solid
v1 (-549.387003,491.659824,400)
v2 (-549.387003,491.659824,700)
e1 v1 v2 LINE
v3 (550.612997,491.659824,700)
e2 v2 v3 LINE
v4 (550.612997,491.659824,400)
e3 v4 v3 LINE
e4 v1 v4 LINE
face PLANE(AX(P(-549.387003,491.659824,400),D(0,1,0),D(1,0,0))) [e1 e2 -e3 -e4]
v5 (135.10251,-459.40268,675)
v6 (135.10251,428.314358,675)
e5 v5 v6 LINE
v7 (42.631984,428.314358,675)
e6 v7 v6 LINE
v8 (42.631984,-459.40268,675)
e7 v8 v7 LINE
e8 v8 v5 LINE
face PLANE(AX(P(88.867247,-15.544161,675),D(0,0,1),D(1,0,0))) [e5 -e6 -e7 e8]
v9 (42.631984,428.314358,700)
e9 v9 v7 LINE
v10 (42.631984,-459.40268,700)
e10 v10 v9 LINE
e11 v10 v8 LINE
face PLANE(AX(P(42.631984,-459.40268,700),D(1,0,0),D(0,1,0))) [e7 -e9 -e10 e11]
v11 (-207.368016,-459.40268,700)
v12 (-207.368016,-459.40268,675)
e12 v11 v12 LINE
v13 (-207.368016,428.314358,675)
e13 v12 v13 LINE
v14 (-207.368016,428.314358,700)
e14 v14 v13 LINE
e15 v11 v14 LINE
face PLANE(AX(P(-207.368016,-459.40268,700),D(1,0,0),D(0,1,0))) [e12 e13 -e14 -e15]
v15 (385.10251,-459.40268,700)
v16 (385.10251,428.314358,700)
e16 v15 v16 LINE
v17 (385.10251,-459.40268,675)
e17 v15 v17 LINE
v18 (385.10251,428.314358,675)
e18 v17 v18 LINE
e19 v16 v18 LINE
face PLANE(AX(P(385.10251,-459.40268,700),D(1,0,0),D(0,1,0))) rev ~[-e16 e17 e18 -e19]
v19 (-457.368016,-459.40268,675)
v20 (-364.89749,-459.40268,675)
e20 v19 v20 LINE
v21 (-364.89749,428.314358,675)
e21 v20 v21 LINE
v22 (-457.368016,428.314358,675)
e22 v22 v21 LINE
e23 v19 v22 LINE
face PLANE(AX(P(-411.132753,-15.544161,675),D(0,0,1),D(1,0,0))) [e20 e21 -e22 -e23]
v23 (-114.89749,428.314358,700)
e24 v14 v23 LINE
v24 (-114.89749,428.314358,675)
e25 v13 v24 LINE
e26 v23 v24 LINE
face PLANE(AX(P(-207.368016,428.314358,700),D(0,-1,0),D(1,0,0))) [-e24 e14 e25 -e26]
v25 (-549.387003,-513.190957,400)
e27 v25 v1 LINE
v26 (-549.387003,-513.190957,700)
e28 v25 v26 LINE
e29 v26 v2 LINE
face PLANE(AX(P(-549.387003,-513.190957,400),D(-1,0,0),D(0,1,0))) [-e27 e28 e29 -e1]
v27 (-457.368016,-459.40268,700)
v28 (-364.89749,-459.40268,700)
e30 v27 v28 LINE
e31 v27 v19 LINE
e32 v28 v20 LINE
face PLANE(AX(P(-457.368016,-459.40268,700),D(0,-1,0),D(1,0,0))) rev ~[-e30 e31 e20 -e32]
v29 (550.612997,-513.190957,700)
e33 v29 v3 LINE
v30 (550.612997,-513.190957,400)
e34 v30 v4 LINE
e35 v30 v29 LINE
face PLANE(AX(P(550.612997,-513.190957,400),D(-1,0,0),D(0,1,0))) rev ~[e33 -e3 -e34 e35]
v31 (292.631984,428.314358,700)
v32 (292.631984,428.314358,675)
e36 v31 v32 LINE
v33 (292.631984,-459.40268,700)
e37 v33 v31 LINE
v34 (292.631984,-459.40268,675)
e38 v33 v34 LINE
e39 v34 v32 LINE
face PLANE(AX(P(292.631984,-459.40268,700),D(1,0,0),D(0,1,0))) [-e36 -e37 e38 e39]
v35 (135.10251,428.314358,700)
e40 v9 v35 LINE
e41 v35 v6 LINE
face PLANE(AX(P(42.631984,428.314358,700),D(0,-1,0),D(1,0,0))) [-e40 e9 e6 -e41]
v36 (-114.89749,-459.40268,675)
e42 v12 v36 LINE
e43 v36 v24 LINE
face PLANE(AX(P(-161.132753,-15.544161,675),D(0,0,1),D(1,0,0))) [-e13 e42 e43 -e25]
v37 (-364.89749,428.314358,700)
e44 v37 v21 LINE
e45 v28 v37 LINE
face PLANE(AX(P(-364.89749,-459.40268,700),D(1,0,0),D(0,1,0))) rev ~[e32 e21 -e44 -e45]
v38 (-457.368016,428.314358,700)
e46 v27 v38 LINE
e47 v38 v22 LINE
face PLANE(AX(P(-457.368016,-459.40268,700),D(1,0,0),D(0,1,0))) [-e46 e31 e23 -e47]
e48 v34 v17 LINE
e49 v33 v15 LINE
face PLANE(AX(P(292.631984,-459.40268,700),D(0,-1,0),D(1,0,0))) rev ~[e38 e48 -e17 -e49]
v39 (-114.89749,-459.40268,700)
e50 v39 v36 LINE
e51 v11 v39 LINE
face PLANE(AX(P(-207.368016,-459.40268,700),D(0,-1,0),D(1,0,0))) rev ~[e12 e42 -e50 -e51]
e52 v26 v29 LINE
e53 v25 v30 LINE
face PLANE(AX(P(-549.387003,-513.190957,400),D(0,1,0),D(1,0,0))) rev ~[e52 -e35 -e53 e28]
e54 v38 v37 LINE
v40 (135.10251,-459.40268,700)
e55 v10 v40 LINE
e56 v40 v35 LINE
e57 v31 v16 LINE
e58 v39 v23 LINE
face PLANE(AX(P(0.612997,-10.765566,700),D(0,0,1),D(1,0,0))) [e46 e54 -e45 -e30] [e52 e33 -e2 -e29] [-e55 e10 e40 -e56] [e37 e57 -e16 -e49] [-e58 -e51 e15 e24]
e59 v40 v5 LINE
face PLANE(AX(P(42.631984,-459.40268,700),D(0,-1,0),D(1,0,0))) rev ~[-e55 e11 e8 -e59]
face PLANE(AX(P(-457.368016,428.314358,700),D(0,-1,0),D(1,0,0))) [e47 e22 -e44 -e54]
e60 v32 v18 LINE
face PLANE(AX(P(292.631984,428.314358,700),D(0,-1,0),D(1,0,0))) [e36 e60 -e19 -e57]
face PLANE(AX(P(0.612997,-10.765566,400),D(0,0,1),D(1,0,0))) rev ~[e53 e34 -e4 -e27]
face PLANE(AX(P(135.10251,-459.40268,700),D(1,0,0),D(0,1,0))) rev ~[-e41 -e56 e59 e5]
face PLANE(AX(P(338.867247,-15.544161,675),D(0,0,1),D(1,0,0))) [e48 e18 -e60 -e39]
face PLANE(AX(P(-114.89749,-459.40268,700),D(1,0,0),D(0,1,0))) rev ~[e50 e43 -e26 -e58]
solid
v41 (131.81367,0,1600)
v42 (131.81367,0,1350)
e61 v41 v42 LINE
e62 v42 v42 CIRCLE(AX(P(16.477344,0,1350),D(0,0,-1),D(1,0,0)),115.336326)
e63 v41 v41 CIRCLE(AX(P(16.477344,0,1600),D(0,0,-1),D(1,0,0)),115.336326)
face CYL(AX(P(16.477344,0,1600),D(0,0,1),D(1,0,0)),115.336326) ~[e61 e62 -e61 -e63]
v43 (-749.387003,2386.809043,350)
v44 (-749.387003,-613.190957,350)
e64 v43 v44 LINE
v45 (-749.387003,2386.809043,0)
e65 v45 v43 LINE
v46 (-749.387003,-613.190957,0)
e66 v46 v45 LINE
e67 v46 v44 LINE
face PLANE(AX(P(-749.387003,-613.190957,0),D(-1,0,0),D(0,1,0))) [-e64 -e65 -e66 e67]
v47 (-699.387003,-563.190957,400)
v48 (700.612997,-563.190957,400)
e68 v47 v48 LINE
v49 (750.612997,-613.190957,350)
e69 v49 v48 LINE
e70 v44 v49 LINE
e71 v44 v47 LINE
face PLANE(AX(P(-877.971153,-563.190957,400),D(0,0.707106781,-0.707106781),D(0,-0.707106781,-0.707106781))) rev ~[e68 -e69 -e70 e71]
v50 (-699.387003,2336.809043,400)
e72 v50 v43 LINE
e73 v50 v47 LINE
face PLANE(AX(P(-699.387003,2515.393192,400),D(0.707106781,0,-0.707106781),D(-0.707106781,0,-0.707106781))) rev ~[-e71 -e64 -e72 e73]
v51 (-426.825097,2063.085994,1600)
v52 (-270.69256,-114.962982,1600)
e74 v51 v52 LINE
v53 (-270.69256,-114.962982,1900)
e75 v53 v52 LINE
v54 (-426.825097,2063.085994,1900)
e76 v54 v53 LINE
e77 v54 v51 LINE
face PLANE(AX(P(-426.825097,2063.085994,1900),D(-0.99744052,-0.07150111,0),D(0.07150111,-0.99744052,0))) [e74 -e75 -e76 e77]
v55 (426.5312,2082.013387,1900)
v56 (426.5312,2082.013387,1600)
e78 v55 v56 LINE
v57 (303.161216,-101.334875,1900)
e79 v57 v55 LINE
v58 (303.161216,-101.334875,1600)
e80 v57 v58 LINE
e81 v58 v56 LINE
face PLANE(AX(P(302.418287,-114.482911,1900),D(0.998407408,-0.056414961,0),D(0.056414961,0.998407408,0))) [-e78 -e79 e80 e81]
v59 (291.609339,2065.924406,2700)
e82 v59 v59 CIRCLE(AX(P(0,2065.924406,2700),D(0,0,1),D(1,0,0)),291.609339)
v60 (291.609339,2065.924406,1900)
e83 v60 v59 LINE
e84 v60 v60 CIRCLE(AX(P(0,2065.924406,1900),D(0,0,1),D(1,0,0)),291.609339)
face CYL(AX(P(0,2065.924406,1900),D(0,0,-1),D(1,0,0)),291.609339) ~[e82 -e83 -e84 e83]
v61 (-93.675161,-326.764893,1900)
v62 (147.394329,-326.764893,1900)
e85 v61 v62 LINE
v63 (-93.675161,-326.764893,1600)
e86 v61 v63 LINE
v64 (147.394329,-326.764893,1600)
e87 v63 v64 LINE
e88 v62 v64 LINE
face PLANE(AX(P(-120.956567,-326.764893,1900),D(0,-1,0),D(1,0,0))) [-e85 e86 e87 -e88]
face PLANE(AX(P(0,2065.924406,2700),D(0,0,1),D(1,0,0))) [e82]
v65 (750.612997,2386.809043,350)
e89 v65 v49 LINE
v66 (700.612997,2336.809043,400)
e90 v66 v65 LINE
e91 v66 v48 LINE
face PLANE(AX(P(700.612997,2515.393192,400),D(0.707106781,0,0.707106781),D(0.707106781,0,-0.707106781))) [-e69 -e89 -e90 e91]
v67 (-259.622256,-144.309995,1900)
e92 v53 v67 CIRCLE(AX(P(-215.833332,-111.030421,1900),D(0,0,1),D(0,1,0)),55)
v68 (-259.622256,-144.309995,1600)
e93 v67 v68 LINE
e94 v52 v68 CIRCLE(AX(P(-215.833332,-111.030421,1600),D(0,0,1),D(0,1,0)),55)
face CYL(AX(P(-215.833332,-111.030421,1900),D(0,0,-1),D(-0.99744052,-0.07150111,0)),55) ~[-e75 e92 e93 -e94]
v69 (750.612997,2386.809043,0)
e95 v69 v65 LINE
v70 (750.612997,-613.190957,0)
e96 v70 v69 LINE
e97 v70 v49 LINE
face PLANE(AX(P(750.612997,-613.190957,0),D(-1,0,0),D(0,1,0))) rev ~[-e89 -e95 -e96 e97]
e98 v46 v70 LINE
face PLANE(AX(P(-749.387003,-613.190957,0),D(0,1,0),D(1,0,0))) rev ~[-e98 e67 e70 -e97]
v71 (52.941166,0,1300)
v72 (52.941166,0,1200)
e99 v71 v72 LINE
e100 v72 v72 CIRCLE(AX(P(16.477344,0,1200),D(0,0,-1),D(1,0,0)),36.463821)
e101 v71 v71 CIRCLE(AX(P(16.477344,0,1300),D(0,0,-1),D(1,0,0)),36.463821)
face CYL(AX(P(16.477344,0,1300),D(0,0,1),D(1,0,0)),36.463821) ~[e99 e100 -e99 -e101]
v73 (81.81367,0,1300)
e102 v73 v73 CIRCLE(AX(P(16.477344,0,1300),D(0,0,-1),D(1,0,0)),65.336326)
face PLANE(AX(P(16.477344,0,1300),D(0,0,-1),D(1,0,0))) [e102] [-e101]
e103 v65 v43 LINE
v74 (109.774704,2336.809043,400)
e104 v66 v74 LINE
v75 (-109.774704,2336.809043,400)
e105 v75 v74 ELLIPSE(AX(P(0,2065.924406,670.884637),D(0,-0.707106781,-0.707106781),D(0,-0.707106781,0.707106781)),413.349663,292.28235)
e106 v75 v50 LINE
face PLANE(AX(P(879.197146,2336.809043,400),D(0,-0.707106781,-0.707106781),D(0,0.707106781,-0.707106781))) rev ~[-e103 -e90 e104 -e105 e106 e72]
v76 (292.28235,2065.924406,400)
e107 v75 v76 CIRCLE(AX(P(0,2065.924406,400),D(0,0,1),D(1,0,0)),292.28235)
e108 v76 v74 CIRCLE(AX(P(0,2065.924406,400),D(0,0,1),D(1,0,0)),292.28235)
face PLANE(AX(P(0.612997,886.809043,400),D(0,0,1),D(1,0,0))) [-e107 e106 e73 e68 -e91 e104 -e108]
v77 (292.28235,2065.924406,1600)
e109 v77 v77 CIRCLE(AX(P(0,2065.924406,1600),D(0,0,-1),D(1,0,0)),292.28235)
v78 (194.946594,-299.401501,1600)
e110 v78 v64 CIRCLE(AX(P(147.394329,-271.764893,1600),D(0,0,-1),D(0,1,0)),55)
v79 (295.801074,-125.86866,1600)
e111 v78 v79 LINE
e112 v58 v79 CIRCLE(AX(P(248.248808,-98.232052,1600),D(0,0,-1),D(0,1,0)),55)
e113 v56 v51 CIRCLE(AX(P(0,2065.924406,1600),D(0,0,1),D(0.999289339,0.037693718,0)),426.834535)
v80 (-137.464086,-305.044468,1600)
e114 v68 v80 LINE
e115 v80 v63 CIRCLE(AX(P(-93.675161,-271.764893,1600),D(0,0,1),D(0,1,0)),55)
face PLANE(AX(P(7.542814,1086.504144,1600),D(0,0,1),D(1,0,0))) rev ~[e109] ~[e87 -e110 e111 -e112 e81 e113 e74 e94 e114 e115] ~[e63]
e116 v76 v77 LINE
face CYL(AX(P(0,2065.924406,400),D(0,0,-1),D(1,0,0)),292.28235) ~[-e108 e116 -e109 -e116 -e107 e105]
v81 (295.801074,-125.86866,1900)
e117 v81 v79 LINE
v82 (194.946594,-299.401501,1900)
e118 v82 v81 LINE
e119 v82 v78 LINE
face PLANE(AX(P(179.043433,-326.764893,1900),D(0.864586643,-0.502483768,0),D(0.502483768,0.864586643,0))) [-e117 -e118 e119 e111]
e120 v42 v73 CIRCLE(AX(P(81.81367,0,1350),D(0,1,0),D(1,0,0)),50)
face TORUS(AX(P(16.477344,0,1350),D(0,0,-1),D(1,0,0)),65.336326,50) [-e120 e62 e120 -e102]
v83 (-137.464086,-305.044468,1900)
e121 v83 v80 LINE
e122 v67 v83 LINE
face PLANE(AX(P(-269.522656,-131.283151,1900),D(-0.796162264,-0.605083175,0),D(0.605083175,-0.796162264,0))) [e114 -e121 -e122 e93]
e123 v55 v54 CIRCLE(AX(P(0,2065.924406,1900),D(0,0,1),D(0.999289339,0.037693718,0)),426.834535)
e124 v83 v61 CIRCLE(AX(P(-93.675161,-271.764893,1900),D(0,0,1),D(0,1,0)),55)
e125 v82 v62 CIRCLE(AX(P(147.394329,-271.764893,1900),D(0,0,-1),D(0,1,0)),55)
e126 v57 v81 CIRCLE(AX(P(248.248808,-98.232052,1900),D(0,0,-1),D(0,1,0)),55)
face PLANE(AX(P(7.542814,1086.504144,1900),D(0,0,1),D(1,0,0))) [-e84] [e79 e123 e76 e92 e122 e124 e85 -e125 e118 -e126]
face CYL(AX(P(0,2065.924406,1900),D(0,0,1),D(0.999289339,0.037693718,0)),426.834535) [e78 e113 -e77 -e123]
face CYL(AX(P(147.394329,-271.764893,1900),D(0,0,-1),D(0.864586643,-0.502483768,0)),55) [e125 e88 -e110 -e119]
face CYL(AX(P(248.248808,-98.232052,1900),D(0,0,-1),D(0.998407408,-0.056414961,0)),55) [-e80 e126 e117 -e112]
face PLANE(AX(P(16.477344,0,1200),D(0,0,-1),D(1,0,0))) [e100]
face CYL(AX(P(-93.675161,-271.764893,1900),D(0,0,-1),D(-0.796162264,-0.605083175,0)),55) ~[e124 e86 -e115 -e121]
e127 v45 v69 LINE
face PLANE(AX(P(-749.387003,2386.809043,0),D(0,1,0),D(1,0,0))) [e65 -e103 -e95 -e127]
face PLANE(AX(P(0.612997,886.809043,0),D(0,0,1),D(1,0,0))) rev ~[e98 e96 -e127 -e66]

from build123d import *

# Parameters (mm, degrees)
F0_W          = 1500
F0_H          = 3000
F1_DEPTH      = 400
F2_R          = 292.2823500565
F3_DEPTH      = 1500
F4_W          = 1100
F4_H          = 1004.8507809427
F5_DEPTH      = 300
F6_W          = 92.4705266953
F6_H          = 887.717038393
F7_DEPTH      = 25
F9_DEPTH      = 300
F10_R         = 115.3363260379
F11_DEPTH     = 300
F12_R         = 50
F13_R         = 36.4638211497
F14_DEPTH     = 100
F15_T1_DEPTH  = 3257.1682987966
F15_T3_DEPTH  = 1757.1682987966
F15_T8_DEPTH  = 1757.1682987966
F15_S9_R      = 292.2823500565
F15_T10_DEPTH = 881
F16_R         = 55
F17_R         = 291.60933864
F18_DEPTH     = 800


# Not quite as in the source:
# - a fillet or chamfer that OpenCascade refuses, or shapes differently, is made with other operations: its cross-section is extruded or revolved along the edge and cut away or added


with BuildPart() as f1:
    # F0 (on Top) → F1 (new body)
    with BuildSketch(Plane.XY):
        with Locations((0.6129965186, 886.8090430593)):
            Rectangle(F0_W, F0_H)
    extrude(amount=F1_DEPTH)

    # F2 (on face) → F3 (join)
    with BuildSketch(Plane.XY.offset(400)):
        with Locations((0, 2065.9244060516)):
            Circle(F2_R)
    extrude(amount=F3_DEPTH)

    # F8 (on face) → F9 (join)
    with BuildSketch(Plane.XY.offset(1900)):
        with BuildLine():
            ThreePointArc((426.5312004435, 2082.0133865738), (-9.4648371748, 2492.653989164), (-426.8250972731, 2063.0859938416))
            Line((-426.8250972731, 2063.0859938416), (-269.5226555892, -131.283150546))
            Line((-269.5226555892, -131.283150546), (-120.9565666461, -326.7648934487))
            Line((-120.9565666461, -326.7648934487), (179.0434333539, -326.7648934487))
            Line((179.0434333539, -326.7648934487), (302.4182868002, -114.4829108661))
            Line((302.4182868002, -114.4829108661), (426.5312004435, 2082.0133865738))
        make_face()
    extrude(amount=-F9_DEPTH)

    # F10 (on face) → F11 (join)
    with BuildSketch(Plane(origin=(0, 0, 1600), x_dir=(1, 0, 0), z_dir=(0, 0, -1))):
        with Locations((16.4773444108, 0)):
            Circle(F10_R)
    extrude(amount=F11_DEPTH)

    # F12
    f12_edges = [f1.edges().sort_by_distance(p)[0] for p in [
        (-98.858982, 0, 1300),
    ]]
    fillet(f12_edges, radius=F12_R)

    # F13 (on face) → F14 (join)
    with BuildSketch(Plane(origin=(0, 0, 1300), x_dir=(1, 0, 0), z_dir=(0, 0, -1))):
        with Locations((16.4773444108, 0)):
            Circle(F13_R)
    extrude(amount=F14_DEPTH)

    # F15: chamfer of 50 on 4 edges, made by hand

    # F15_s2 → F15_t1 (cut)
    with BuildSketch(Plane.XZ.offset(-2515.3931924576)):
        Polygon((700.6129965186, 400), (750.6129965186, 350), (750.6129965186, 400), align=None)
        Polygon((-699.3870034814, 400), (-749.3870034814, 350), (-749.3870034814, 400), align=None)
    extrude(amount=F15_T1_DEPTH, mode=Mode.SUBTRACT)

    # F15_s4 → F15_t3 (cut)
    with BuildSketch(Plane.YZ.offset(-877.9711528797)):
        Polygon((-563.1909569407, 400), (-613.1909569407, 350), (-613.1909569407, 400), align=None)
    extrude(amount=F15_T3_DEPTH, mode=Mode.SUBTRACT)


with BuildPart() as f5:
    # F4 (on face) → F5 (new body)
    with BuildSketch(Plane.XY.offset(400)):
        with Locations((0.6129965186, -10.7655664693)):
            Rectangle(F4_W, F4_H)
    extrude(amount=F5_DEPTH)

    # F6 (on face) → F7 (cut)
    with BuildSketch(Plane.XY.offset(700)):
        with Locations((-411.1327528954, -15.5441612005)):
            Rectangle(F6_W, F6_H)
        with Locations((-161.1327528954, -15.5441612005)):
            Rectangle(F6_W, F6_H)
        with Locations((88.8672471046, -15.5441612005)):
            Rectangle(F6_W, F6_H)
        with Locations((338.8672471046, -15.5441612005)):
            Rectangle(F6_W, F6_H)
    extrude(amount=-F7_DEPTH, mode=Mode.SUBTRACT)


with BuildPart() as f15_tool6:
    # F15_s7 → F15_t8 (new body)
    with BuildSketch(Plane.YZ.offset(879.1971459169)):
        Polygon((2336.8090430593, 400), (2386.8090430593, 350), (2386.8090430593, 400), align=None)
    extrude(amount=-F15_T8_DEPTH)

    # F15_s9 → F15_t10 (cut, symmetric)
    with BuildSketch(Plane.XY.offset(375)):
        with Locations((0, 2065.9244060516)):
            Circle(F15_S9_R)
    extrude(amount=F15_T10_DEPTH, both=True, mode=Mode.SUBTRACT)


with BuildPart() as f1_1:
    add(f1.part)

    # F15_t5: cut F15_tool6
    add(f15_tool6.part, mode=Mode.SUBTRACT)

    # F16
    f16_edges = [f1_1.edges().sort_by_distance(p)[0] for p in [
        (302.418287, -114.482911, 1750),
        (179.043433, -326.764893, 1750),
        (-120.956567, -326.764893, 1750),
        (-269.522656, -131.283151, 1750),
    ]]
    fillet(f16_edges, radius=F16_R)

    # F17 (on face) → F18 (join)
    with BuildSketch(Plane.XY.offset(1900)):
        with Locations((0, 2065.9244060516)):
            Circle(F17_R)
    extrude(amount=F18_DEPTH)


solid = Compound([f5.part, f1_1.part])
